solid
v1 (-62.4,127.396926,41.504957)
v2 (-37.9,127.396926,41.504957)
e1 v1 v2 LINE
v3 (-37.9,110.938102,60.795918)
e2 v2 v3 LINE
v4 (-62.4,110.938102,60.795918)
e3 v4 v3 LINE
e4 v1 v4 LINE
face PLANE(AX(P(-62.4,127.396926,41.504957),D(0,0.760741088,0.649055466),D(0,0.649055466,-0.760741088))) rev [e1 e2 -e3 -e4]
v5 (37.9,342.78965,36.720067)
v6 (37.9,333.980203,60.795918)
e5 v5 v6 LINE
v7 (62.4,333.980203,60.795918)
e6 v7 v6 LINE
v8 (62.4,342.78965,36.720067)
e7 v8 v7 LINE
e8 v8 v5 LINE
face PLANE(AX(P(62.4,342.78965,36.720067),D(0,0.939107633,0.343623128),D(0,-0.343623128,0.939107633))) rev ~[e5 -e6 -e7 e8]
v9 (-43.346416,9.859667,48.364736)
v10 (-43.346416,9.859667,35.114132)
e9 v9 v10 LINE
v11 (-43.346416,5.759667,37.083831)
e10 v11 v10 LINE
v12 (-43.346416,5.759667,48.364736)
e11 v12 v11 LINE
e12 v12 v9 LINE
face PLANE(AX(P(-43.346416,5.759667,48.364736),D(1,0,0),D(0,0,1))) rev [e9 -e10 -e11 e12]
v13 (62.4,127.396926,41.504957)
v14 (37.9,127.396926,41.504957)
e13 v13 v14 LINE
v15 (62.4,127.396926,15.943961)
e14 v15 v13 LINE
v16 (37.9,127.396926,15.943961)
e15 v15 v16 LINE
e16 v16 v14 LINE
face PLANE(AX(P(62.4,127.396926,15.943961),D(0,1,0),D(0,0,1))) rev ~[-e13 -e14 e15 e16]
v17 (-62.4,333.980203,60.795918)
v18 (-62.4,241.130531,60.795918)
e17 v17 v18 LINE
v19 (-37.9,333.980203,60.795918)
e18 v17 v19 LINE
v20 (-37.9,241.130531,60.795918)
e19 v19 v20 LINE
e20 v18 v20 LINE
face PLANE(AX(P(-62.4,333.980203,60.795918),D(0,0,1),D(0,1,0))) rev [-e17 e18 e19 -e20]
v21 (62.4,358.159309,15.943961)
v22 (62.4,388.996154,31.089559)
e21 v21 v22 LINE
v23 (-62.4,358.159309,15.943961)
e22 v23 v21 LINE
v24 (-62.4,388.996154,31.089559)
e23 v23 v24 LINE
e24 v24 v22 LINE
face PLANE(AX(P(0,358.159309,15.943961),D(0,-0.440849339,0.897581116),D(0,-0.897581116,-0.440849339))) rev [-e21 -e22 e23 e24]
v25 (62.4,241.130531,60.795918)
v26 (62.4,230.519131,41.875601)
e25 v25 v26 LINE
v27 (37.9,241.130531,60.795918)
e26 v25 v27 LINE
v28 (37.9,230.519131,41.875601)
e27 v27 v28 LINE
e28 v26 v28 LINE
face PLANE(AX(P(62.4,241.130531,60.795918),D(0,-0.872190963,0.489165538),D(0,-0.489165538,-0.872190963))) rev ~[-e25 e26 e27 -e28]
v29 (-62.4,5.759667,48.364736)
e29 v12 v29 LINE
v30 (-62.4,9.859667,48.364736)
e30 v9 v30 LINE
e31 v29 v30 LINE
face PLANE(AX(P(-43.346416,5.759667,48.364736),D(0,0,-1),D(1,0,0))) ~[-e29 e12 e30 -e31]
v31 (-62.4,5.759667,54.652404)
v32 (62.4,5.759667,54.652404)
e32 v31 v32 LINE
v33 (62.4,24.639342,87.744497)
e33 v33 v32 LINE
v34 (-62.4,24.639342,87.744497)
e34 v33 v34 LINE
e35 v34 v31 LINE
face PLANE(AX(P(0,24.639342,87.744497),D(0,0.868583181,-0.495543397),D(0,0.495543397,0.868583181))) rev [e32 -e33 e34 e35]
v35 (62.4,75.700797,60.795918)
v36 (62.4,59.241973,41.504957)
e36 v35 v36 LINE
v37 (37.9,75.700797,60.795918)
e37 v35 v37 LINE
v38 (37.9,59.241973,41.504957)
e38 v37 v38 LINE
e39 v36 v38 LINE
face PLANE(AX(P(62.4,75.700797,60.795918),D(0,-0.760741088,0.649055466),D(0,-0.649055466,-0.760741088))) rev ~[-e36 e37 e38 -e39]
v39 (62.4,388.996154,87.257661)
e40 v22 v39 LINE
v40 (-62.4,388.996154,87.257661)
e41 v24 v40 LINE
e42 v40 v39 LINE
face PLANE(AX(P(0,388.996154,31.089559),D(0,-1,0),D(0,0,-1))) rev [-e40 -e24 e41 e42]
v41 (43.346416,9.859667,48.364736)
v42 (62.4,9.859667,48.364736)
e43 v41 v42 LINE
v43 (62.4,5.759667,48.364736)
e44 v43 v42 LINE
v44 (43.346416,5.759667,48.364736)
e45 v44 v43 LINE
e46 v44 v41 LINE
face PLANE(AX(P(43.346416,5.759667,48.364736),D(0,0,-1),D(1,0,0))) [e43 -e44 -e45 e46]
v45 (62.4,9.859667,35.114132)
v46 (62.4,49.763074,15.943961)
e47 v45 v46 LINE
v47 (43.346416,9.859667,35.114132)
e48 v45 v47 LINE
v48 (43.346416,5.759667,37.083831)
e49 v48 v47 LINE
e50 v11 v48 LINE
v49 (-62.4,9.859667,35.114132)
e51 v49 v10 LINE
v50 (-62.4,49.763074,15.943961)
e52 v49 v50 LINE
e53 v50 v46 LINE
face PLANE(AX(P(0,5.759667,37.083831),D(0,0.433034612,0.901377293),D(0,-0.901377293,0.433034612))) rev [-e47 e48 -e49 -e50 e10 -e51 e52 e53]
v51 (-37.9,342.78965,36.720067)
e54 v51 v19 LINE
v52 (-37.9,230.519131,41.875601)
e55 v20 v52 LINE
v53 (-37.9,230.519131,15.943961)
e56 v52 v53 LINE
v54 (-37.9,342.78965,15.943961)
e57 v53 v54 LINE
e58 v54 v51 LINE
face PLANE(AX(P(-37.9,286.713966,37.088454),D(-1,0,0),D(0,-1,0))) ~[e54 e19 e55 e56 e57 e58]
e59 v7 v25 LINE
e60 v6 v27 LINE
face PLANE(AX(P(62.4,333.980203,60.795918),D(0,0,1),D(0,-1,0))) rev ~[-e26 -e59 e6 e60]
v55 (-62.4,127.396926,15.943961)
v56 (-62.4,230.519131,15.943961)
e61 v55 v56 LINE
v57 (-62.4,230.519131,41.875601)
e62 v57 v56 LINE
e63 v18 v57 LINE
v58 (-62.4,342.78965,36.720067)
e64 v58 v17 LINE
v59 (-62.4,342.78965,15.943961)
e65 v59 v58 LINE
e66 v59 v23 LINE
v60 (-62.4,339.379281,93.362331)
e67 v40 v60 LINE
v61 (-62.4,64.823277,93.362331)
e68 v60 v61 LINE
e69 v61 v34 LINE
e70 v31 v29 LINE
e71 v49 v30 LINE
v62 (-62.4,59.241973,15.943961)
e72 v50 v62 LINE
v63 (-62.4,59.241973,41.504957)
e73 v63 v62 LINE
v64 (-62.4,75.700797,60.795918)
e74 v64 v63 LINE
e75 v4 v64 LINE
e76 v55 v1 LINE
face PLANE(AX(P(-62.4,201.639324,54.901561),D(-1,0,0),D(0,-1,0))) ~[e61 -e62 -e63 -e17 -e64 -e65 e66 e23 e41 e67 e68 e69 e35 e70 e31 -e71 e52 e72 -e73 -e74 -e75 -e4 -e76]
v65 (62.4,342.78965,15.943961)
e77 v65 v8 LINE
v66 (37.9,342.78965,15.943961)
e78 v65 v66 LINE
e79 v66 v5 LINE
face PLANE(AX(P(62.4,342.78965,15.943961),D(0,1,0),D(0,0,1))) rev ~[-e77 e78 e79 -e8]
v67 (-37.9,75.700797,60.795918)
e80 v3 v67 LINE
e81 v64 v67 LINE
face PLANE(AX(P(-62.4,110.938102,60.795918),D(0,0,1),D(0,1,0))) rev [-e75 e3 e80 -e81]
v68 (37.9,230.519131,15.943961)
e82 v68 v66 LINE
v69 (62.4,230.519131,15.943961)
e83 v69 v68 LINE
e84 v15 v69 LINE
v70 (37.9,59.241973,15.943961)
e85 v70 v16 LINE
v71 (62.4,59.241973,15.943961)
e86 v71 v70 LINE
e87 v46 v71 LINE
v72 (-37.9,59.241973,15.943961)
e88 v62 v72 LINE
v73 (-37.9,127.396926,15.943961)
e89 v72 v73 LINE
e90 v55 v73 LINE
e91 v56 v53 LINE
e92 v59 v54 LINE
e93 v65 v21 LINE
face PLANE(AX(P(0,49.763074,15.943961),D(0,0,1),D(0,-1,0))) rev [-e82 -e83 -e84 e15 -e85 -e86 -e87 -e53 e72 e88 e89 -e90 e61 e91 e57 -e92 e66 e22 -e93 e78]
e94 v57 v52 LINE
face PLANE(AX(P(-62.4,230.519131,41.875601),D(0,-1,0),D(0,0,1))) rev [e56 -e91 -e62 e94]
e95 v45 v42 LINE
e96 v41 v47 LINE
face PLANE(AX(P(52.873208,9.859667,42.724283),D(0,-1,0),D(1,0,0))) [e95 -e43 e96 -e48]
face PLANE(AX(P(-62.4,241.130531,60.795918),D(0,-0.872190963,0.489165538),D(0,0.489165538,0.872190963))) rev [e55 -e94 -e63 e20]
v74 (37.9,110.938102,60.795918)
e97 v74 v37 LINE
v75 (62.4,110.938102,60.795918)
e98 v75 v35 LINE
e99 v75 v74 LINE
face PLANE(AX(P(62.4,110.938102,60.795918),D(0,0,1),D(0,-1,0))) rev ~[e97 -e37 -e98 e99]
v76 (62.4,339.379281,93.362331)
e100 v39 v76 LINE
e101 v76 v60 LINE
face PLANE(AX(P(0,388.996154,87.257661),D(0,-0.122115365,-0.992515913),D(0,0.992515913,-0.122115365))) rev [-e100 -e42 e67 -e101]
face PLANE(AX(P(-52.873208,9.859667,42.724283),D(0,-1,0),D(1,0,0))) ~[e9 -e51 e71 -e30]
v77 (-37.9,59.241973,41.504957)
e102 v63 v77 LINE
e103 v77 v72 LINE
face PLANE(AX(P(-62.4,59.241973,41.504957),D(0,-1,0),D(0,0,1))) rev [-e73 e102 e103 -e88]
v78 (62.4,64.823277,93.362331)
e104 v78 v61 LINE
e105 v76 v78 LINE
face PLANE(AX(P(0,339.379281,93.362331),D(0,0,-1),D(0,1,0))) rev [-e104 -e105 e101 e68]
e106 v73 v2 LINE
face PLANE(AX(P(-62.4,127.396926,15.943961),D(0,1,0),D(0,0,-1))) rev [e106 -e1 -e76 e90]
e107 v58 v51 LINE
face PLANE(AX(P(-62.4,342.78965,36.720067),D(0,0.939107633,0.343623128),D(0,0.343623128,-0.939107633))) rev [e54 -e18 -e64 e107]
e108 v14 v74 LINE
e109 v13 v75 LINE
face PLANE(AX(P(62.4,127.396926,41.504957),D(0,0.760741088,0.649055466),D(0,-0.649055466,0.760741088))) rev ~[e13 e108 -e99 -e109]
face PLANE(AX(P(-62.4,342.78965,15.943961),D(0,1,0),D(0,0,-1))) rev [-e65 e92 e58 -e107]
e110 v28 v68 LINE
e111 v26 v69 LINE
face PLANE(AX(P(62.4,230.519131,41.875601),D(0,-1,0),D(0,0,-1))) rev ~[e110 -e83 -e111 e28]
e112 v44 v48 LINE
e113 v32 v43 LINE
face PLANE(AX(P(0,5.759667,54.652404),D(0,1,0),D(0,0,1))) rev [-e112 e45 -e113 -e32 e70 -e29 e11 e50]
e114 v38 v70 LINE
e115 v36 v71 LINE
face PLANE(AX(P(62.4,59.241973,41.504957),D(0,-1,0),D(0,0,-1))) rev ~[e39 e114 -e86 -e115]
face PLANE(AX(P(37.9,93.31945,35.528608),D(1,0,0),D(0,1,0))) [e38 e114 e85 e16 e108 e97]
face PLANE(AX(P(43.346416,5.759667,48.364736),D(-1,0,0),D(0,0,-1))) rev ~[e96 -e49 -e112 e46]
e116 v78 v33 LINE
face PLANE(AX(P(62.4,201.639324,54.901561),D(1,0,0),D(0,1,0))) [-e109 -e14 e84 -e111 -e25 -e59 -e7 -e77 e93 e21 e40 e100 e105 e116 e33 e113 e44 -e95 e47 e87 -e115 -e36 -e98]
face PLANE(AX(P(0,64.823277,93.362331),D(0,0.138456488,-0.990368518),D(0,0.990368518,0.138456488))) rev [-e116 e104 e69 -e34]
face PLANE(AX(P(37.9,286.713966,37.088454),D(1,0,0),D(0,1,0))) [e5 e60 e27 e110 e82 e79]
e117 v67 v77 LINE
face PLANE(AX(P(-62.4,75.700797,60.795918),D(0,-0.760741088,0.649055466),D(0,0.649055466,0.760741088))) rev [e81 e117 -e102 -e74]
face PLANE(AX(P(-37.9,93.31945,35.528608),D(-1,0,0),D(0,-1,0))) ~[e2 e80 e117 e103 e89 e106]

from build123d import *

# Parameters (mm, degrees)
F1_DEPTH = 62.4
F4_DEPTH = 24.5
F5_W     = 19.0535837948
F5_H     = 11.2809054554
F5_H_2   = 2.8878487647
F6_DEPTH = 4.1


# Not quite as in the source:
# - a pattern or mirror of a feature is missing from the dataset's text; its kind, count and spacing are read off the source's solid


with BuildPart() as f1:
    # F0 (on Right) → F1 (new body)
    with BuildSketch(Plane.YZ):
        Polygon((24.6393419802, 87.7444967628), (5.7596671395, 54.6524040401), (5.7596671395, 37.0838306844), (49.7630737395, 15.9439614351), (358.1593094913, 15.9439614351), (388.9961540699, 31.0895591974), (388.9961540699, 87.2576609254), (339.3792808056, 93.3623313904), (64.8232772946, 93.3623313904), align=None)
    extrude(amount=F1_DEPTH)

    # F2: F1 across plane


with BuildPart() as f1_1:
    add(f1.part)
    add(f1.part.mirror(Plane.YZ))

    # F3 (on face) → F4 (cut)
    with BuildSketch(Plane.YZ.offset(62.4)):
        Polygon((59.2419728637, 15.9439614351), (127.3969262838, 15.9439614351), (127.3969262838, 41.5049567819), (110.9381020069, 60.795918107), (75.7007971406, 60.795918107), (59.2419728637, 41.5049567819), align=None)
        Polygon((230.519130826, 15.9439614351), (342.7896499634, 15.9439614351), (342.7896499634, 36.7200672626), (333.9802026749, 60.795918107), (241.1305308342, 60.795918107), (230.519130826, 41.8756008148), align=None)
    f4 = extrude(amount=-F4_DEPTH, mode=Mode.SUBTRACT)

    # F4_copies: F4 across plane
    add(f4.mirror(Plane(origin=(0, 0, 0), x_dir=(0, 0, -1), z_dir=(-1, 0, 0))), mode=Mode.SUBTRACT)

    # F5 (on face) → F6 (cut)
    with BuildSketch(Plane.XZ.offset(-5.7596671395)):
        with Locations((52.8732081026, 42.7242834121)):
            Rectangle(F5_W, F5_H)
        with Locations((52.8732081026, 35.6399063021)):
            Rectangle(F5_W, F5_H_2)
    f6 = extrude(amount=-F6_DEPTH, mode=Mode.SUBTRACT)

    # F6_copies: F6 across plane
    add(f6.mirror(Plane(origin=(0, 0, 0), x_dir=(0, 0, -1), z_dir=(-1, 0, 0))), mode=Mode.SUBTRACT)


solid = f1_1.part
